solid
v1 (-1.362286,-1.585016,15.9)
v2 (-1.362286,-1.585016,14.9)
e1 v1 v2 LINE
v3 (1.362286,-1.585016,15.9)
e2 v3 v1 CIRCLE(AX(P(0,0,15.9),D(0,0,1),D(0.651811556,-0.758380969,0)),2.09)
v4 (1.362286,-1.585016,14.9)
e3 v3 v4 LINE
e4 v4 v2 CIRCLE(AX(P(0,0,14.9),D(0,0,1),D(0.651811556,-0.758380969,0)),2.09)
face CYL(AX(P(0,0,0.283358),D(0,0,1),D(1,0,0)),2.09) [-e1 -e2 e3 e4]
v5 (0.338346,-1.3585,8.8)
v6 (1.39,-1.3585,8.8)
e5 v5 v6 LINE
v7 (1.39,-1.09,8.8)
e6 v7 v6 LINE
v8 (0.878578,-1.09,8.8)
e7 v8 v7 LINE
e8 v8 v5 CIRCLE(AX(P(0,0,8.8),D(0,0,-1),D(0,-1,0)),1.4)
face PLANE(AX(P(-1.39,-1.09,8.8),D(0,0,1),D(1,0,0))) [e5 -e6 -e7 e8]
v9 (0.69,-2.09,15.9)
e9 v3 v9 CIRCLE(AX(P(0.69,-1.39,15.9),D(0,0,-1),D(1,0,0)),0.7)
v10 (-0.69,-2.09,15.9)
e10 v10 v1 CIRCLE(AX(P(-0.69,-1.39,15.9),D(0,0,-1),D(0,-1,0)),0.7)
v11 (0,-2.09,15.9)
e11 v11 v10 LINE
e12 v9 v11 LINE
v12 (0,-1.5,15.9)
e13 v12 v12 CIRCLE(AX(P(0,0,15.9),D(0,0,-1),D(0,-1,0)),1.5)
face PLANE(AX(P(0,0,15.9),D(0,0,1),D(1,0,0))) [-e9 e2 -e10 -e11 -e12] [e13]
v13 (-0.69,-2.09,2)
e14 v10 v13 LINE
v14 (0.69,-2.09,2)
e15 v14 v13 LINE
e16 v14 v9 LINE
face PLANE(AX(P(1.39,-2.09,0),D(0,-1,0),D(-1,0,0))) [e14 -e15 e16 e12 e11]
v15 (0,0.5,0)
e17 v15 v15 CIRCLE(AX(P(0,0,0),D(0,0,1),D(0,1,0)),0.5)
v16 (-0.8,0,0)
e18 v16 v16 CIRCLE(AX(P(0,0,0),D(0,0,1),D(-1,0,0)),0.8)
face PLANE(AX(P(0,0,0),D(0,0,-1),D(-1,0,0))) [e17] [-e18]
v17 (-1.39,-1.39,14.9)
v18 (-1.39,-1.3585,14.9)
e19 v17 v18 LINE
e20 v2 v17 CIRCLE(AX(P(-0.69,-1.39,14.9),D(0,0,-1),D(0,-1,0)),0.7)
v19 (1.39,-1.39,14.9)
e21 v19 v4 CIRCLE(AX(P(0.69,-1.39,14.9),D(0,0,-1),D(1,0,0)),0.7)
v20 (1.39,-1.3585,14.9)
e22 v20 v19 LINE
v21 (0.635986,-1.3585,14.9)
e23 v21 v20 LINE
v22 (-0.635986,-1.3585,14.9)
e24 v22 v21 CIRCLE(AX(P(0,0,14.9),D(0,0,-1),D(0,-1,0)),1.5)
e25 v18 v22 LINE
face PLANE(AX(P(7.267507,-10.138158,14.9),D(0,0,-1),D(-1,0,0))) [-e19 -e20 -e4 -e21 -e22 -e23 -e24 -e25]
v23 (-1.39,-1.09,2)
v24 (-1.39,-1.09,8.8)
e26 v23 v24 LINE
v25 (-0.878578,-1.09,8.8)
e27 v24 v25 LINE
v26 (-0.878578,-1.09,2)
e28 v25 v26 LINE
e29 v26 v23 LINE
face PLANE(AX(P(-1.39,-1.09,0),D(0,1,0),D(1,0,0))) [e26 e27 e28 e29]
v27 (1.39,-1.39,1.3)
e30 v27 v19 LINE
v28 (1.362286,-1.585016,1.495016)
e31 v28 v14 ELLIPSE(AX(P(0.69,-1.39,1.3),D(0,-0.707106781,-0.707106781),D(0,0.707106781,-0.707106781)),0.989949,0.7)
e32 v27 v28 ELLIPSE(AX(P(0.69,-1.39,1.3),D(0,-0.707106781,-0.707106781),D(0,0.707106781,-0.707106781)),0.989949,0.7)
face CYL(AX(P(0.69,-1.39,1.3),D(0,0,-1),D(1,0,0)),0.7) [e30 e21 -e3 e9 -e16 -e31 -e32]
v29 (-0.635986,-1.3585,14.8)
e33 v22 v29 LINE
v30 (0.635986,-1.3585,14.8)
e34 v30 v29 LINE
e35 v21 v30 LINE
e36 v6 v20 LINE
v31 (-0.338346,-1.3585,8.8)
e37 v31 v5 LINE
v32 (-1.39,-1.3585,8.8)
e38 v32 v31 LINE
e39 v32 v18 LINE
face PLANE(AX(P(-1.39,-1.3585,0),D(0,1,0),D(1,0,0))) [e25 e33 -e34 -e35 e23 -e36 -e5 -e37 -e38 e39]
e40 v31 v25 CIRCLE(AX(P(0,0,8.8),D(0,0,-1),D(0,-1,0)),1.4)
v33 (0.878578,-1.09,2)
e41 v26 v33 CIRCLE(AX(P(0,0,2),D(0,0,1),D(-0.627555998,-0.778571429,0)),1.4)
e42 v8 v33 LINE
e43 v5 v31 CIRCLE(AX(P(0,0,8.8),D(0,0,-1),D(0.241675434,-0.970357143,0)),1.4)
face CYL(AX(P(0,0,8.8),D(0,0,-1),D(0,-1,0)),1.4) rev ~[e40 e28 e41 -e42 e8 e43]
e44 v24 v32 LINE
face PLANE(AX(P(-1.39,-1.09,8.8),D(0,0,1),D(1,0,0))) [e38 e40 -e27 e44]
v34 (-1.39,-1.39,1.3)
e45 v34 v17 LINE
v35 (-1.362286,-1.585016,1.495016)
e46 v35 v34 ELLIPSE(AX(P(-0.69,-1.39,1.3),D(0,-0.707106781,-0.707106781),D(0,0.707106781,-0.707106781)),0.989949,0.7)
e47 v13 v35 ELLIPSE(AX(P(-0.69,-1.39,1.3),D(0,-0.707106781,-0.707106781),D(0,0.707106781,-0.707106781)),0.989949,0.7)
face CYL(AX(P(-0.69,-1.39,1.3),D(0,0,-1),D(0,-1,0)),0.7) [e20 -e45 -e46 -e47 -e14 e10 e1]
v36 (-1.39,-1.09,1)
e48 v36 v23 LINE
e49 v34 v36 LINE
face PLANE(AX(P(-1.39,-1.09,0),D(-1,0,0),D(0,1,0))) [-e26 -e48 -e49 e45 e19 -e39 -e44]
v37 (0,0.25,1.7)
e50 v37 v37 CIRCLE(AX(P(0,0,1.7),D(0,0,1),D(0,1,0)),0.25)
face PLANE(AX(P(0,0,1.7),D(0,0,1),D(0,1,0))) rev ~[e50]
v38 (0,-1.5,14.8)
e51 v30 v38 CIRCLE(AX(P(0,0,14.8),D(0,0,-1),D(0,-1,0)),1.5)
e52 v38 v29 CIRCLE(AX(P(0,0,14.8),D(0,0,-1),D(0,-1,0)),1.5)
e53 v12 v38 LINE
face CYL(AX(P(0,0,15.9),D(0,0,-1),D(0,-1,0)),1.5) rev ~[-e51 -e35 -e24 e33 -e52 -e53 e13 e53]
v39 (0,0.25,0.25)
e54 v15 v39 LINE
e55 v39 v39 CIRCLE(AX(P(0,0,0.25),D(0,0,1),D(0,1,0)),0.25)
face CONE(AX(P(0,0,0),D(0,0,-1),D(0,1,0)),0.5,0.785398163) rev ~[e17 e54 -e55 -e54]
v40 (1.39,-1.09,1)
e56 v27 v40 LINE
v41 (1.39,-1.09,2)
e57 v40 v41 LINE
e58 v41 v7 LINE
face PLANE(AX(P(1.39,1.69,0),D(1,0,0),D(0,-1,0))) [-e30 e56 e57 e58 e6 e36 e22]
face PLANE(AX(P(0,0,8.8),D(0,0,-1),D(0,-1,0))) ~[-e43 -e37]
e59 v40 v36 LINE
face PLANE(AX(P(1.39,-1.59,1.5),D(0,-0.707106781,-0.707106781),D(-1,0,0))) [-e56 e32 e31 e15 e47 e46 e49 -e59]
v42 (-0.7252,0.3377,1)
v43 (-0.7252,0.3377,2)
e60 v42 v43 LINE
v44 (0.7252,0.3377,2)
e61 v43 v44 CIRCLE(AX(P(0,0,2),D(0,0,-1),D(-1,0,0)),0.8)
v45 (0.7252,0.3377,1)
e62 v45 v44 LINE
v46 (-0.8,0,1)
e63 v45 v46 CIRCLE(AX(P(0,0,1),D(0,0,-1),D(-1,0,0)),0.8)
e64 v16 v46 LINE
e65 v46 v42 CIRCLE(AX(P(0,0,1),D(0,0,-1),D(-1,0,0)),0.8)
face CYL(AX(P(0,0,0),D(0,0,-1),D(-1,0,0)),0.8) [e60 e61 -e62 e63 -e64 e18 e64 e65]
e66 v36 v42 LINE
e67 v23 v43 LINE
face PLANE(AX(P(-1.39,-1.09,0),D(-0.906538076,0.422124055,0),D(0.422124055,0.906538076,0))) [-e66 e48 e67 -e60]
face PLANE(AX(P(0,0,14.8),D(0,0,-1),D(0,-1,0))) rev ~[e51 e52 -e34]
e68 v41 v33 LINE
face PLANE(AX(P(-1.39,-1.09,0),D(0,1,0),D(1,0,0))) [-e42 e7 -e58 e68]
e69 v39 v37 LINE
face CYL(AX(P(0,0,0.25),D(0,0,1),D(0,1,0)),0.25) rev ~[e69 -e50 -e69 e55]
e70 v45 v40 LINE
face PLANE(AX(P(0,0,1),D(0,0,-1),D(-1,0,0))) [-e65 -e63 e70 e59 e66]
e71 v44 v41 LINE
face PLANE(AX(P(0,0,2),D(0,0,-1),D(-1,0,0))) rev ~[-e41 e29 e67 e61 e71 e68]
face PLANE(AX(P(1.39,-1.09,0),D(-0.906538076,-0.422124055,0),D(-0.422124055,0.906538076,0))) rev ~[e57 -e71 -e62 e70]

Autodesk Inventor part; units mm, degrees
ref_plane "YZ Plane" through (0, 0, 0) normal (1, 0, 0) x (0, 1, 0)
ref_plane "XZ Plane" through (0, 0, 0) normal (0, 1, 0) x (-1, 0, 0)
ref_plane "XY Plane" through (0, 0, 0) normal (0, 0, 1) x (1, 0, 0)
sketch "Sketch1" plane through (0, 0, 0) normal (0, 0, 1) x (1, 0, 0)
  line L0 (-1.39, -1.09) -> (1.39, -1.09)
  line L1 (1.39, -1.09) -> (1.39, -2.09)
  line L2 (1.39, -2.09) -> (-1.39, -2.09)
  line L3 (-1.39, -2.09) -> (-1.39, -1.09)
  point P0 (0, 0)
  dimension "d0" = 1
  dimension "d1" = 1.39
  dimension "d2" = 2.78
  dimension "d3" = 1.09
extrude "Extrusion1" add sketch "Sketch1" along normal blind 15.9
sketch "Sketch2" plane through (-1.39, -1.09, 0) normal (0, 1, 0) x (1, 0, 0)
  line L0 (0, 0) -> (0, -15.9) projected
  line L1 (0, -8.8) -> (2.78, -8.8)
  line L2 (2.78, -8.8) -> (2.78, -15.9)
  line L3 (2.78, -15.9) -> (0, -15.9)
  line L4 (0, -15.9) -> (0, -8.8)
  point P0 (1.39, 0)
  dimension "d6" = 7.1
extrude "Extrusion2" cut sketch "Sketch2" against normal blind 0.2685
sketch "Sketch3" plane through (0, 0, 0) normal (0, 0, -1) x (-1, 0, 0)
  line L0 (-1.39, -1.09) -> (1.39, -1.09)
  line L1 (1.39, -1.09) -> (1.39, 1.69)
  line L2 (1.39, 1.69) -> (-1.39, 1.69)
  line L3 (-1.39, 1.69) -> (-1.39, -1.09)
  point P0 (0, 0)
  dimension "d9" = 2.78
extrude "Extrusion3" add sketch "Sketch3" against normal blind 2
sketch "Sketch4" plane through (0, 0, 0) normal (0, 0, -1) x (-1, 0, 0)
  line L0 (-1.39, 1.69) -> (-1.39, -2.09) projected
  line L1 (1.39, -2.09) -> (1.39, 1.69) projected
  line L2 (1.39, 1.69) -> (-1.39, 1.69) projected
  circle A0 centre (0, 0) radius 0.8
  line L3 (-1.39, -1.3585) -> (1.39, -1.3585) projected
  line L4 (-1.39, -1.09) -> (1.39, -1.09) projected
  line L5 (-1.39, -1.09) -> (-0.7252, 0.3377)
  line L6 (1.39, -1.09) -> (0.7252, 0.3377)
  dimension "d12" = 1.6
extrude "Extrusion4" cut sketch "Sketch4" against normal through all contours L2 L1 L6 A0 L5 L0
sketch "Sketch5" plane through (0, 0, 0) normal (0, 0, -1) x (-1, 0, 0)
  line L0 (-0.7252, 0.3377) -> (-1.39, -1.09) projected
  line L1 (-1.39, -1.09) -> (-1.39, -2.09) projected
  line L2 (-1.39, -2.09) -> (1.39, -2.09) projected
  line L3 (1.39, -2.09) -> (1.39, -1.09) projected
  line L4 (1.39, -1.09) -> (0.7252, 0.3377) projected
  arc A0 (0.7252, 0.3377) -> (-0.7252, 0.3377) centre (0, 0) ccw projected
  circle A1 centre (0, 0) radius 0.8
extrude "Extrusion5" cut sketch "Sketch5" against normal blind 1 contours A1 L4 L3 L2 L1 L0
hole "Hole1" at (0, 0, 0) direction (0, 0, 1) diameter 0.5 depth 1.7 countersink diameter 1 countersink angle 90
sketch "Sketch6" plane through (-1.39, -2.09, 15.9) normal (0, -1, 0) x (1, 0, 0)
  line L0 (2.78, -15.9) -> (2.78, 0) projected
  line L1 (2.78, 0) -> (0, 0) projected
  circle A0 centre (1.39, -1.5) radius 0.5
  point P0 (2.78, -14.9)
  point P1 (1.39, -15.9)
  point P2 (1.39, -1)
  point P3 (1.39, -2)
  dimension "d26" = 1
  dimension "d27" = 1.39
  dimension "d28" = 1.5
extrude "Extrusion6" [suppressed]
chamfer "Chamfer1" distance 1 angle 45 1 edges at (0, -2.09, 1)
ref_plane "Work Plane1" through (0, -2.09, 14.9) normal (0, 0, 1) x (1, 0, 0)
ref_plane "Work Plane2" through (0, -2.09, 13.9) normal (0, 0, 1) x (1, 0, 0)
sketch "Sketch10" plane through (0, 0, 15.9) normal (0, 0, 1) x (1, 0, 0)
  line L0 (1.39, -1.3585) -> (-1.39, -1.3585) projected
  circle A0 centre (0, 0) radius 2.09
  line L1 (1.39, -2.09) -> (-1.39, -2.09) projected
  dimension "d54" = 4.18
extrude "Extrusion7" add sketch "Sketch10" against normal blind 1
sketch "Sketch11" plane through (0, 0, 15.9) normal (0, 0, 1) x (1, 0, 0)
  arc A0 (1.39, -1.5608) -> (-1.39, -1.5608) centre (0, 0) ccw projected
  circle A1 centre (0, 0) radius 1.3
  point P0 (1.6431, -0.954)
  point P1 (-1.6431, -0.954)
  dimension "d41" = 2.6
hole "Hole2" at (0, 0, 15.9) direction (0, 0, -1) diameter 3 depth 1.1
fillet "Fillet3" radius 0.7 2 edges at (1.39, -2.09, 8.95) (-1.39, -2.09, 8.95)
sketch "Sketch13" plane through (-1.39, -1.09, 8.8) normal (0, 0, 1) x (1, 0, 0)
  point P0 (1.39, 1.09)
  point P1 (1.39, 1.09)
hole "Hole4" at (0, 0, 8.8) at (0, 0, 8.8) direction (0, 0, -1) diameter 2.8 depth 6.8
sketch "Sketch15" plane through (0, -2.09, 14.9) normal (0, 0, 1) x (1, 0, 0)
  point P0 (0, 2.09)
  point P1 (0, 2.09)
hole "Hole5" [suppressed]
properties part number "MU_Motor_Asm_Frame_new3" material "Aluminum-6061"
